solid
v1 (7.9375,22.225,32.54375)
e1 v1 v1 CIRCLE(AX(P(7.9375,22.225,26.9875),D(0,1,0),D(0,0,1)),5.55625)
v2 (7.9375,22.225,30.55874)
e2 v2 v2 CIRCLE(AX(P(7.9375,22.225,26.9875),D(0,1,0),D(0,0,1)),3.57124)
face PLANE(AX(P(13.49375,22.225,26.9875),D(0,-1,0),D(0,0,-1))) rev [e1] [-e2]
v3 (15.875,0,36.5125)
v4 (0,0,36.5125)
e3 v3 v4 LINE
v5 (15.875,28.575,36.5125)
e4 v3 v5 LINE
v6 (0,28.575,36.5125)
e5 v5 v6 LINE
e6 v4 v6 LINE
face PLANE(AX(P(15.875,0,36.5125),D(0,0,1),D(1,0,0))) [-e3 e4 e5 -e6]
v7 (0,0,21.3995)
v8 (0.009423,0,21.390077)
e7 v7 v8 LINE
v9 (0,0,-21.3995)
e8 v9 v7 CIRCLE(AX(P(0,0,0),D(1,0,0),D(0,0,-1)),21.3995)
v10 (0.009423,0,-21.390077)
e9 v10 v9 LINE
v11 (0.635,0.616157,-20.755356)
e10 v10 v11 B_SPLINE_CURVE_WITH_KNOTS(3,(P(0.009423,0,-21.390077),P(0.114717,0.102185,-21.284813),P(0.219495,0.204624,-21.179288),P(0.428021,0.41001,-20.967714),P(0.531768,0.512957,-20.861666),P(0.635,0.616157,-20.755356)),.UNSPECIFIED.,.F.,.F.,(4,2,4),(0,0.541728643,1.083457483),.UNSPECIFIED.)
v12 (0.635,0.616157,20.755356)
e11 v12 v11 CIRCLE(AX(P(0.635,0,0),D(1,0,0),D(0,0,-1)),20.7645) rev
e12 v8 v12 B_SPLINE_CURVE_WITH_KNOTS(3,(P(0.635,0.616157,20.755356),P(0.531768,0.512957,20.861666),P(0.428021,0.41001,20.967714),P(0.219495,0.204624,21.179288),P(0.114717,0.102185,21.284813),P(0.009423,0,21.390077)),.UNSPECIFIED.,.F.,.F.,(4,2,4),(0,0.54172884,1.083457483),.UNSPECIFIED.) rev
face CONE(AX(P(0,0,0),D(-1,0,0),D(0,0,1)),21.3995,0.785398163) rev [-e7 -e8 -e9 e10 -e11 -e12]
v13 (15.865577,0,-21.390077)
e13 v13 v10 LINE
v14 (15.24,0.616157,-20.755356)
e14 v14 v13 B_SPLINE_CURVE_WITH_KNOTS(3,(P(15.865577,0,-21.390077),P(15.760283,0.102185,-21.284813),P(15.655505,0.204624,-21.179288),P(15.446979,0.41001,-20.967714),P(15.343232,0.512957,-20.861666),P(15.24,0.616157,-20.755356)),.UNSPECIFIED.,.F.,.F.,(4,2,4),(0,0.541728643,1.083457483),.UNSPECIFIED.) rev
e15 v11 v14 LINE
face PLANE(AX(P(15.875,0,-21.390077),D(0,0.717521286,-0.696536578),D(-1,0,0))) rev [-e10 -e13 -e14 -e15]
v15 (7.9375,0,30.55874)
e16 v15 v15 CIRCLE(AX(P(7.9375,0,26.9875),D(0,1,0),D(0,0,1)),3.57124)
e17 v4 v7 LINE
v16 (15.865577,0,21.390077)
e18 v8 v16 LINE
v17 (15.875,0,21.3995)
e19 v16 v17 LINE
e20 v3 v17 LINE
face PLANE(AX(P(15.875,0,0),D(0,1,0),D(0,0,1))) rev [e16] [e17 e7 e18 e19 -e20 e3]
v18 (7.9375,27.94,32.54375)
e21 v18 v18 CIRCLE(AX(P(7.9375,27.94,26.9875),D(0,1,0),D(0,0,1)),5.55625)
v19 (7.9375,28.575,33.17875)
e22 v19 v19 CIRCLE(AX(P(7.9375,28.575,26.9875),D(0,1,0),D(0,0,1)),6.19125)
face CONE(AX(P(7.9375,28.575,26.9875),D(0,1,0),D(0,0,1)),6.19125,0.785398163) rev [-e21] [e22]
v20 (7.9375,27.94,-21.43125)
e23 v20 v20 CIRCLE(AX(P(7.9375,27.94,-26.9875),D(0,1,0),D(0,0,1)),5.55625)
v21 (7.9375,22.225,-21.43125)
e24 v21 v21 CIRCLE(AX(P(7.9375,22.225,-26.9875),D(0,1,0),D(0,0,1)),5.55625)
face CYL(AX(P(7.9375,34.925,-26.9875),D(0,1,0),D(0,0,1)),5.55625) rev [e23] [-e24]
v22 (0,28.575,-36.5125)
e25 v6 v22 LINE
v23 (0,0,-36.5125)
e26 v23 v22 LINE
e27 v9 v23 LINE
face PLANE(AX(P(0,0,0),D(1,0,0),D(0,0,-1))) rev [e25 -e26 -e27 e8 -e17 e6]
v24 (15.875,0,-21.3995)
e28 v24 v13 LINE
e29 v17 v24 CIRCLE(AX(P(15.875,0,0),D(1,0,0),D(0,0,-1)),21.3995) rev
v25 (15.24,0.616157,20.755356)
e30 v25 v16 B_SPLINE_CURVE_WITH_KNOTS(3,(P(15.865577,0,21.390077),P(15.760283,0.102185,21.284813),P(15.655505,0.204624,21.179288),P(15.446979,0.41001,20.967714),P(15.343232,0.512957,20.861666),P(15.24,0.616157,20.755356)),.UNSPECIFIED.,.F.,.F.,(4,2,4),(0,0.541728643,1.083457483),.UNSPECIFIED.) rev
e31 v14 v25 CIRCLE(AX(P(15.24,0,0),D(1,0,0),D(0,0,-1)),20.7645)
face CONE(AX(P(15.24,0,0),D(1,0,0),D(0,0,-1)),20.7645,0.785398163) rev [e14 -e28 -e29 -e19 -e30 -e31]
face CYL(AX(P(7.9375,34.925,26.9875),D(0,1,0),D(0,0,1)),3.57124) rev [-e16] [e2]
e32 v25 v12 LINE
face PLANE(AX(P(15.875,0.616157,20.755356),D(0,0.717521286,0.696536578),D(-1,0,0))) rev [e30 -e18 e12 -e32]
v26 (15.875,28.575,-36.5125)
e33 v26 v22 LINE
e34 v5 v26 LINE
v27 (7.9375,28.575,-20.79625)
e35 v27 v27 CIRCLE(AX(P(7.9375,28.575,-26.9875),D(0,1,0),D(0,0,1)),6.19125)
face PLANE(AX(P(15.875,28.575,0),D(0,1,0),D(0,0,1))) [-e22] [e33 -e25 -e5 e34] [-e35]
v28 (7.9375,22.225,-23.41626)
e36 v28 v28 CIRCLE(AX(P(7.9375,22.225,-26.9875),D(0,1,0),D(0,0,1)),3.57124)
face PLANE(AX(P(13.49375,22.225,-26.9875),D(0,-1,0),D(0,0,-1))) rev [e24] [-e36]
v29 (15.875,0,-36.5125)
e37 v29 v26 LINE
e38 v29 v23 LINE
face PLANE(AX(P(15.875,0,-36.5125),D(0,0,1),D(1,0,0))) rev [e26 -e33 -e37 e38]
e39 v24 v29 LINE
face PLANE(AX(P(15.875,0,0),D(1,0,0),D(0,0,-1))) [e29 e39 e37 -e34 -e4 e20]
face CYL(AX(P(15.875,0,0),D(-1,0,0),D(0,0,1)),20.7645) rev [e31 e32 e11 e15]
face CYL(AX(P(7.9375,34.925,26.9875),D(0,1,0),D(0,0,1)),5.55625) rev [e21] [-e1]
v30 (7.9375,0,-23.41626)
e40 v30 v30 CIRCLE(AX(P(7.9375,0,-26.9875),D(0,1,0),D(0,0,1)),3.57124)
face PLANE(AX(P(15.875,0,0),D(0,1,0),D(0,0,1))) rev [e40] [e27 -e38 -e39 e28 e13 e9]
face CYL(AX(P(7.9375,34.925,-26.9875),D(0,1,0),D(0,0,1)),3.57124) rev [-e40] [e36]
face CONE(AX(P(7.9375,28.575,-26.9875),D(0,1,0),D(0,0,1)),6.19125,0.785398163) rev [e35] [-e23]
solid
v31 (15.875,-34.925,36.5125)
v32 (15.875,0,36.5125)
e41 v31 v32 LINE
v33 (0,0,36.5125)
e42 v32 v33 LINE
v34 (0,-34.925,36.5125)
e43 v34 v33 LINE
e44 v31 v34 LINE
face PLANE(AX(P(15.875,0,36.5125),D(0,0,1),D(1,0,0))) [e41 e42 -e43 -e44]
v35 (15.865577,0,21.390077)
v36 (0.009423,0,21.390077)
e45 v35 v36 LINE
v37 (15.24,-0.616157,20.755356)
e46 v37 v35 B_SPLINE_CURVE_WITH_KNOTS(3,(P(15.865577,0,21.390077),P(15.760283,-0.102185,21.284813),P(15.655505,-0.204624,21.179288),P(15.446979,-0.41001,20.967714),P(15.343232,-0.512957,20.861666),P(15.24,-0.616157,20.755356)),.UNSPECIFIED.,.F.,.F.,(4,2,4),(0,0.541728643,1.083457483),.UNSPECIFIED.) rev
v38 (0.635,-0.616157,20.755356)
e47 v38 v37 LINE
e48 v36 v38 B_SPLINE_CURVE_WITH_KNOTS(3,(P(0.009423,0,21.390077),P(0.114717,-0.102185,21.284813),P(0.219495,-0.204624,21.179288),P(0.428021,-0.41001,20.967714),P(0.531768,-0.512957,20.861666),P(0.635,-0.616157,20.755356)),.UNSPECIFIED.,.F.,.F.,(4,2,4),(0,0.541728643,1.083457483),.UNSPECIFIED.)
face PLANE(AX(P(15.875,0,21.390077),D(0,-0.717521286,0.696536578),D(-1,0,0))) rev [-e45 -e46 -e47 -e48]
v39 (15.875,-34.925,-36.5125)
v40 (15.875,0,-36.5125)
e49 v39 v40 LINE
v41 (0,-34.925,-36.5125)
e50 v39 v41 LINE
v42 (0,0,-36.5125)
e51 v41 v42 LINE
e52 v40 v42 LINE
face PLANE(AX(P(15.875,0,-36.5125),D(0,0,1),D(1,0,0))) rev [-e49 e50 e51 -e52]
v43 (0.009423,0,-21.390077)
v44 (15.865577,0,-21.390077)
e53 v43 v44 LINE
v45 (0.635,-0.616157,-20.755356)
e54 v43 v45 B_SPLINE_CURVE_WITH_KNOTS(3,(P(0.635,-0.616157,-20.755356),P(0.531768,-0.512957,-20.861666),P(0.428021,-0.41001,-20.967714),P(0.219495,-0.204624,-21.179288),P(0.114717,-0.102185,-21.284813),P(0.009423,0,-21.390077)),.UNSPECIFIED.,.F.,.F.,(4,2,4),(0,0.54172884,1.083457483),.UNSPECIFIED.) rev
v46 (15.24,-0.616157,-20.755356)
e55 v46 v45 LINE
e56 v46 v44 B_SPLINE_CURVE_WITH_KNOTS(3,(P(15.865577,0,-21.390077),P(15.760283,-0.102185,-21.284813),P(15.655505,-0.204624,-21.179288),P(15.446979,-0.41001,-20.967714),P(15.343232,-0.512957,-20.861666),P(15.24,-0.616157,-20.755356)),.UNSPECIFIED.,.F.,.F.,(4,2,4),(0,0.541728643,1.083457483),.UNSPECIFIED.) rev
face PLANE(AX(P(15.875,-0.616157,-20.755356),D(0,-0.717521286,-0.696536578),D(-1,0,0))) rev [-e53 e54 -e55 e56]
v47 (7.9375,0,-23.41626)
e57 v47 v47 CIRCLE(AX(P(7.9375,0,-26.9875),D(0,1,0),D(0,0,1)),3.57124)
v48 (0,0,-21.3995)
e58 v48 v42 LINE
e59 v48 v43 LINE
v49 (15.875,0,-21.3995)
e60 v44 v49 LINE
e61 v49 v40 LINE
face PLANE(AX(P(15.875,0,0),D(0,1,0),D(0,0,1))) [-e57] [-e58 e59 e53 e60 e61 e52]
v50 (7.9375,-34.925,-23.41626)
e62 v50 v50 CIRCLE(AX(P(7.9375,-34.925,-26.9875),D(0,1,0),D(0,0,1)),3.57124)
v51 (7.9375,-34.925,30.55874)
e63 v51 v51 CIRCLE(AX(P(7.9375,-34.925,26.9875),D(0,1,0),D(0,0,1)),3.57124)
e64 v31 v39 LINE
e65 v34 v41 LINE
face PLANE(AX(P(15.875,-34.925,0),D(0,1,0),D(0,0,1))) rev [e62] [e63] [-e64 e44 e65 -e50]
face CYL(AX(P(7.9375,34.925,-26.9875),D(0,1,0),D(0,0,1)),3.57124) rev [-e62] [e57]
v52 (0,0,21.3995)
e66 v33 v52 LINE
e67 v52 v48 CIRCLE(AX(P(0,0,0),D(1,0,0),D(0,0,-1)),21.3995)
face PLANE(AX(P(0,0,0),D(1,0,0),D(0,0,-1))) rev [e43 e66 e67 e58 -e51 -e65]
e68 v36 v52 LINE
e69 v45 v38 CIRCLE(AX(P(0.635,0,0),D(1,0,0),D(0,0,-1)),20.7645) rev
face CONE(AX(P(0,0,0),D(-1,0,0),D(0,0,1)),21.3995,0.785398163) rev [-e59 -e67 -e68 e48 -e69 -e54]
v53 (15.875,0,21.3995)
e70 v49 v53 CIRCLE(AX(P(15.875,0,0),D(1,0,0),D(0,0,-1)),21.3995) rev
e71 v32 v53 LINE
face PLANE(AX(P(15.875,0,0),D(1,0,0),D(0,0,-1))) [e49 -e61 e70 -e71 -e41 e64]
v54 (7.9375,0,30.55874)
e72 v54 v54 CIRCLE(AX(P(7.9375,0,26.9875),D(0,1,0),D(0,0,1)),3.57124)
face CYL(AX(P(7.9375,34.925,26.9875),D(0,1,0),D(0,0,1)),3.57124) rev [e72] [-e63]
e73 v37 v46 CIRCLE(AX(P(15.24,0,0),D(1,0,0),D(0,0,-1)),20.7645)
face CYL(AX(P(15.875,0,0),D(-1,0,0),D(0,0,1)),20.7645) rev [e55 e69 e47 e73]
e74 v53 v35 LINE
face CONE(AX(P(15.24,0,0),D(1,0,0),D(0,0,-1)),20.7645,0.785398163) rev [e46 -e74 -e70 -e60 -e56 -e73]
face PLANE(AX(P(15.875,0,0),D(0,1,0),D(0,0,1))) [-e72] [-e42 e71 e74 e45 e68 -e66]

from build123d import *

# Parameters (mm, degrees)
BOSS_EXTRUDE1_DEPTH                           = 15.875
BOSS_EXTRUDE2_DEPTH                           = 15.875
CBORE_FOR_1_4_SOCKET_HEAD_CAP_SCREW1_AT_COUNT = 2
CBORE_FOR_1_4_SOCKET_HEAD_CAP_SCREW1_AT_PITCH = 53.975
MOVE_FACE1_BY                                 = 0.127
MOVE_FACE1_2_BY                               = 0.127
MOVE_START                                    = 28.575
MOVE_FACE2_OUTLINE_W                          = 15.875
MOVE_FACE2_OUTLINE_H                          = 73.025
MOVE_FACE2_OUTLINE_R                          = 5.55625
MOVE_FACE2_DEPTH                              = 6.35
MOVE_START_2                                  = 22.225
MOVE_FACE2_2_OUTLINE_R                        = 5.55625
MOVE_FACE2_2_OUTLINE_R_2                      = 3.57124
MOVE_FACE2_2_DEPTH                            = 6.35


with BuildPart() as part:
    # Sketch1 → Boss-Extrude1 (new body)
    with BuildSketch(Plane(origin=(0, 0, 0), x_dir=(0, 0, -1), z_dir=(1, 0, 0))):
        with BuildLine():
            Line((36.5125, 0), (20.6375, 0))
            ThreePointArc((20.6375, 0), (0, -20.6375), (-20.6375, 0))
            Line((-20.6375, 0), (-36.5125, 0))
            Line((-36.5125, 0), (-36.5125, -34.925))
            Line((-36.5125, -34.925), (36.5125, -34.925))
            Line((36.5125, -34.925), (36.5125, 0))
        make_face()
    extrude(amount=BOSS_EXTRUDE1_DEPTH)


with BuildPart() as body_2:
    # Sketch1<3> → Boss-Extrude2 (new body)
    with BuildSketch(Plane(origin=(0, 0, 0), x_dir=(0, 0, -1), z_dir=(1, 0, 0))):
        with BuildLine():
            ThreePointArc((-20.6375, 0), (0, 20.6375), (20.6375, 0))
            Line((20.6375, 0), (36.5125, 0))
            Line((36.5125, 0), (36.5125, 34.925))
            Line((36.5125, 34.925), (-36.5125, 34.925))
            Line((-36.5125, 34.925), (-36.5125, 0))
            Line((-36.5125, 0), (-20.6375, 0))
        make_face()
    extrude(amount=BOSS_EXTRUDE2_DEPTH)


with BuildPart() as cbore_for_1_4_socket_head_cap_screw1_tool:
    # Sketch4 → CBORE for 1/4 Socket Head Cap Screw1 (revolve)
    with BuildSketch(Plane(origin=(7.9375, 34.925, 26.9875), x_dir=(0, 0, 1), z_dir=(1, 0, 0))):
        Polygon((0, 0), (0, 69.85), (3.57124, 69.85), (3.57124, 6.35), (5.55625, 6.35), (5.55625, 0.635), (6.19125, 0), align=None)
    cbore_for_1_4_socket_head_cap_screw1 = revolve(axis=Axis((7.9375, 41.275, 26.9875), (0, -1, 0)))


with BuildPart() as part_1:
    add(part.part)

    # CBORE for 1/4 Socket Head Cap Screw1: cut by cbore_for_1_4_socket_head_cap_screw1_tool
    add(cbore_for_1_4_socket_head_cap_screw1_tool.part, mode=Mode.SUBTRACT)


with BuildPart() as body_2_1:
    add(body_2.part)

    # CBORE for 1/4 Socket Head Cap Screw1: cut by cbore_for_1_4_socket_head_cap_screw1_tool
    add(cbore_for_1_4_socket_head_cap_screw1_tool.part, mode=Mode.SUBTRACT)


with BuildPart() as cbore_for_1_4_socket_head_cap_screw1_at_tool:
    # CBORE for 1/4 Socket Head Cap Screw1 at: CBORE for 1/4 Socket Head Cap Screw1 ×2
    with Locations(*[(0, 0, -i * CBORE_FOR_1_4_SOCKET_HEAD_CAP_SCREW1_AT_PITCH) for i in range(1, CBORE_FOR_1_4_SOCKET_HEAD_CAP_SCREW1_AT_COUNT)]):
        add(cbore_for_1_4_socket_head_cap_screw1)


with BuildPart() as part_2:
    add(part_1.part)

    # CBORE for 1/4 Socket Head Cap Screw1 at: cut by cbore_for_1_4_socket_head_cap_screw1_at_tool
    add(cbore_for_1_4_socket_head_cap_screw1_at_tool.part, mode=Mode.SUBTRACT)

    # Move Face1 2: a curved face moved inward by 0.127
    add(Solid.thicken(part_2.faces().sort_by_distance((7.9375, -20.6375, 0))[0], -MOVE_FACE1_2_BY), mode=Mode.SUBTRACT)

    # Chamfer2
    # the kernel refuses this chamfer: 0.635 mm, written as the material it takes off along each edge
    with BuildSketch(Plane(origin=(0, 0, 0), x_dir=(0, 0.07868977926472538, -0.9968991516895122), z_dir=(0, 0.9968991516895122, 0.07868977926472538))) as chamfer2_piece_1:
        with BuildLine():
            Line((21.417460512, 0.017960512), (20.746539488, -0.652960512))
            Line((20.746539488, -0.652960512), (20.733839488, -0.652960512))
            ThreePointArc((20.733839488, -0.652960512), (20.7518, -0.326480256), (20.7518, 0))
            Line((20.7518, 0), (20.7645, 0.0127))
            ThreePointArc((20.7645, 0.0127), (21.090980256, 0.0127), (21.417460512, 0.030660512))
            Line((21.417460512, 0.030660512), (21.417460512, 0.017960512))
        make_face()
    revolve(axis=Axis((0, 0, 0), (-1, 0, 0)), revolution_arc=189.026516368, mode=Mode.SUBTRACT)
    with BuildSketch(Plane(origin=(-1.610111621, 0, -20.7645), x_dir=(0, 0, -1), z_dir=(1, 0, 0))) as chamfer2_piece_2:
        with BuildLine():
            Line((0.643801601, 0.017692029), (-0.027368853, -0.633849299))
            Line((-0.027368853, -0.633849299), (-0.040063261, -0.633472445))
            ThreePointArc((-0.040063261, -0.633472445), (-0.015119867, -0.316902726), (-0.0127, 0))
            Line((-0.0127, 0), (0, 0.0127))
            ThreePointArc((0, 0.0127), (0.3219008, 0.0127), (0.643801601, 0.030392029))
            Line((0.643801601, 0.030392029), (0.643801601, 0.017692029))
        make_face()
    extrude(amount=19.095223242, mode=Mode.SUBTRACT)
    with BuildSketch(Plane(origin=(-1.610111621, 0, 20.7645), x_dir=(0, -0.9998899044534173, -0.01483842889716635), z_dir=(1, 0, 0))) as chamfer2_piece_3:
        with BuildLine():
            Line((0.634185626, 0.017960512), (-0.027243086, -0.643468199))
            Line((-0.027243086, -0.643468199), (-0.039941687, -0.643279751))
            ThreePointArc((-0.039941687, -0.643279751), (-0.017475104, -0.321676913), (-0.012698602, 0.000188448))
            Line((-0.012698602, 0.000188448), (0.000188448, 0.012698602))
            ThreePointArc((0.000188448, 0.012698602), (0.317092192, 0.010415864), (0.633997178, 0.030659114))
            Line((0.633997178, 0.030659114), (0.634185626, 0.017960512))
        make_face()
    extrude(amount=19.095223242, mode=Mode.SUBTRACT)
    with BuildSketch(Plane(origin=(15.875, 0, 0), x_dir=(0, 0.0786897792647254, -0.9968991516895122), z_dir=(0, 0.9968991516895122, 0.0786897792647254))) as chamfer2_piece_4:
        with BuildLine():
            Line((20.746539488, 0.652960512), (21.417460512, -0.017960512))
            Line((21.417460512, -0.017960512), (21.417460512, -0.030660512))
            ThreePointArc((21.417460512, -0.030660512), (21.090980256, -0.0127), (20.7645, -0.0127))
            Line((20.7645, -0.0127), (20.7518, 0))
            ThreePointArc((20.7518, 0), (20.7518, 0.326480256), (20.733839488, 0.652960512))
            Line((20.733839488, 0.652960512), (20.746539488, 0.652960512))
        make_face()
    revolve(axis=Axis((15.875, 0, 0), (-1, 0, 0)), revolution_arc=189.026516368, mode=Mode.SUBTRACT)


with BuildPart() as body_2_2:
    add(body_2_1.part)

    # CBORE for 1/4 Socket Head Cap Screw1 at: cut by cbore_for_1_4_socket_head_cap_screw1_at_tool
    add(cbore_for_1_4_socket_head_cap_screw1_at_tool.part, mode=Mode.SUBTRACT)

    # Move Face1: a curved face moved inward by 0.127
    add(Solid.thicken(body_2_2.faces().sort_by_distance((7.9375, 20.6375, 0))[0], -MOVE_FACE1_BY), mode=Mode.SUBTRACT)

    # Move Face2: read off the stored shape, not the designer's step
    # Move Face2 outline → Move Face2 (cut)
    with BuildSketch(Plane(origin=(0, 0, 0), x_dir=(1, 0, 0), z_dir=(0, 1, 0)).offset(MOVE_START)):
        with Locations((7.9375, 0)):
            Rectangle(MOVE_FACE2_OUTLINE_W, MOVE_FACE2_OUTLINE_H)
        with Locations((7.9375, -26.9875)):
            Circle(MOVE_FACE2_OUTLINE_R, mode=Mode.SUBTRACT)
        with Locations((7.9375, 26.9875)):
            Circle(MOVE_FACE2_OUTLINE_R, mode=Mode.SUBTRACT)
    extrude(amount=MOVE_FACE2_DEPTH, mode=Mode.SUBTRACT)

    # Move Face2 2 outline → Move Face2 2 (cut)
    # profile 1 of 2: a face of its own
    with BuildSketch(Plane(origin=(0, 0, 0), x_dir=(1, 0, 0), z_dir=(0, 1, 0)).offset(MOVE_START_2)):
        with Locations((7.9375, 26.9875)):
            Circle(MOVE_FACE2_2_OUTLINE_R)
        with Locations((7.9375, 26.9875)):
            Circle(MOVE_FACE2_2_OUTLINE_R_2, mode=Mode.SUBTRACT)
    # profile 2 of 2: a face of its own
    with BuildSketch(Plane(origin=(0, 0, 0), x_dir=(1, 0, 0), z_dir=(0, 1, 0)).offset(MOVE_START_2)):
        with Locations((7.9375, -26.9875)):
            Circle(MOVE_FACE2_2_OUTLINE_R)
        with Locations((7.9375, -26.9875)):
            Circle(MOVE_FACE2_2_OUTLINE_R_2, mode=Mode.SUBTRACT)
    extrude(amount=MOVE_FACE2_2_DEPTH, mode=Mode.SUBTRACT)

    # Move Face2 3: loft between two sections, ruled curve by curve
    move_face2_3_from = [
        Edge.make_three_point_arc((7.9375, 27.94, -21.43125), (13.49375, 27.94, -26.9875), (7.9375, 27.94, -32.54375)),
        Edge.make_three_point_arc((7.9375, 27.94, -32.54375), (2.38125, 27.94, -26.9875), (7.9375, 27.94, -21.43125)),
    ]
    move_face2_3_to = [
        Edge.make_three_point_arc((7.9375, 28.575, -20.79625), (14.12875, 28.575, -26.9875), (7.9375, 28.575, -33.17875)),
        Edge.make_three_point_arc((7.9375, 28.575, -33.17875), (1.74625, 28.575, -26.9875), (7.9375, 28.575, -20.79625)),
    ]
    move_face2_3 = Solid(Shell([*[Face.make_surface_from_curves(move_face2_3_from[k], move_face2_3_to[k]) for k in range(2)], Face(Wire(move_face2_3_from)), Face(Wire(move_face2_3_to))]))
    add(move_face2_3, mode=Mode.SUBTRACT)

    # Move Face2 4: loft between two sections, ruled curve by curve
    move_face2_4_from = [
        Edge.make_three_point_arc((7.9375, 27.94, 32.54375), (13.49375, 27.94, 26.9875), (7.9375, 27.94, 21.43125)),
        Edge.make_three_point_arc((7.9375, 27.94, 21.43125), (2.38125, 27.94, 26.9875), (7.9375, 27.94, 32.54375)),
    ]
    move_face2_4_to = [
        Edge.make_three_point_arc((7.9375, 28.575, 33.17875), (14.12875, 28.575, 26.9875), (7.9375, 28.575, 20.79625)),
        Edge.make_three_point_arc((7.9375, 28.575, 20.79625), (1.74625, 28.575, 26.9875), (7.9375, 28.575, 33.17875)),
    ]
    move_face2_4 = Solid(Shell([*[Face.make_surface_from_curves(move_face2_4_from[k], move_face2_4_to[k]) for k in range(2)], Face(Wire(move_face2_4_from)), Face(Wire(move_face2_4_to))]))
    add(move_face2_4, mode=Mode.SUBTRACT)

    # Chamfer1
    # the kernel refuses this chamfer: 0.635 mm, written as the material it takes off along each edge
    with BuildSketch(Plane(origin=(0, 0, 0), x_dir=(0, -0.0786897792647251, 0.9968991516895122), z_dir=(0, -0.9968991516895122, -0.0786897792647251))) as chamfer1_piece_1:
        with BuildLine():
            Line((21.417460512, 0.017960512), (20.746539488, -0.652960512))
            Line((20.746539488, -0.652960512), (20.733839488, -0.652960512))
            ThreePointArc((20.733839488, -0.652960512), (20.7518, -0.326480256), (20.7518, 0))
            Line((20.7518, 0), (20.7645, 0.0127))
            ThreePointArc((20.7645, 0.0127), (21.090980256, 0.0127), (21.417460512, 0.030660512))
            Line((21.417460512, 0.030660512), (21.417460512, 0.017960512))
        make_face()
    revolve(axis=Axis((0, 0, 0), (-1, 0, 0)), revolution_arc=189.026516368, mode=Mode.SUBTRACT)
    with BuildSketch(Plane(origin=(-1.610111621, 0, 20.7645), x_dir=(0, 0, 1), z_dir=(1, 0, 0))) as chamfer1_piece_2:
        with BuildLine():
            Line((0.643801601, 0.017692029), (-0.027368853, -0.633849299))
            Line((-0.027368853, -0.633849299), (-0.040063261, -0.633472445))
            ThreePointArc((-0.040063261, -0.633472445), (-0.015119867, -0.316902726), (-0.0127, 0))
            Line((-0.0127, 0), (0, 0.0127))
            ThreePointArc((0, 0.0127), (0.3219008, 0.0127), (0.643801601, 0.030392029))
            Line((0.643801601, 0.030392029), (0.643801601, 0.017692029))
        make_face()
    extrude(amount=19.095223242, mode=Mode.SUBTRACT)
    with BuildSketch(Plane(origin=(-1.610111621, 0, -20.7645), x_dir=(0, 0.9998899044534173, 0.014838428897166573), z_dir=(1, 0, 0))) as chamfer1_piece_3:
        with BuildLine():
            Line((0.634185626, 0.017960512), (-0.027243086, -0.643468199))
            Line((-0.027243086, -0.643468199), (-0.039941687, -0.643279751))
            ThreePointArc((-0.039941687, -0.643279751), (-0.017475104, -0.321676913), (-0.012698602, 0.000188448))
            Line((-0.012698602, 0.000188448), (0.000188448, 0.012698602))
            ThreePointArc((0.000188448, 0.012698602), (0.317092192, 0.010415864), (0.633997178, 0.030659114))
            Line((0.633997178, 0.030659114), (0.634185626, 0.017960512))
        make_face()
    extrude(amount=19.095223242, mode=Mode.SUBTRACT)
    with BuildSketch(Plane(origin=(15.875, 0, 0), x_dir=(0, -0.07868977926472513, 0.9968991516895122), z_dir=(0, -0.9968991516895122, -0.07868977926472513))) as chamfer1_piece_4:
        with BuildLine():
            Line((20.746539488, 0.652960512), (21.417460512, -0.017960512))
            Line((21.417460512, -0.017960512), (21.417460512, -0.030660512))
            ThreePointArc((21.417460512, -0.030660512), (21.090980256, -0.0127), (20.7645, -0.0127))
            Line((20.7645, -0.0127), (20.7518, 0))
            ThreePointArc((20.7518, 0), (20.7518, 0.326480256), (20.733839488, 0.652960512))
            Line((20.733839488, 0.652960512), (20.746539488, 0.652960512))
        make_face()
    revolve(axis=Axis((15.875, 0, 0), (-1, 0, 0)), revolution_arc=189.026516368, mode=Mode.SUBTRACT)


solid = Compound([part_2.part, body_2_2.part])
